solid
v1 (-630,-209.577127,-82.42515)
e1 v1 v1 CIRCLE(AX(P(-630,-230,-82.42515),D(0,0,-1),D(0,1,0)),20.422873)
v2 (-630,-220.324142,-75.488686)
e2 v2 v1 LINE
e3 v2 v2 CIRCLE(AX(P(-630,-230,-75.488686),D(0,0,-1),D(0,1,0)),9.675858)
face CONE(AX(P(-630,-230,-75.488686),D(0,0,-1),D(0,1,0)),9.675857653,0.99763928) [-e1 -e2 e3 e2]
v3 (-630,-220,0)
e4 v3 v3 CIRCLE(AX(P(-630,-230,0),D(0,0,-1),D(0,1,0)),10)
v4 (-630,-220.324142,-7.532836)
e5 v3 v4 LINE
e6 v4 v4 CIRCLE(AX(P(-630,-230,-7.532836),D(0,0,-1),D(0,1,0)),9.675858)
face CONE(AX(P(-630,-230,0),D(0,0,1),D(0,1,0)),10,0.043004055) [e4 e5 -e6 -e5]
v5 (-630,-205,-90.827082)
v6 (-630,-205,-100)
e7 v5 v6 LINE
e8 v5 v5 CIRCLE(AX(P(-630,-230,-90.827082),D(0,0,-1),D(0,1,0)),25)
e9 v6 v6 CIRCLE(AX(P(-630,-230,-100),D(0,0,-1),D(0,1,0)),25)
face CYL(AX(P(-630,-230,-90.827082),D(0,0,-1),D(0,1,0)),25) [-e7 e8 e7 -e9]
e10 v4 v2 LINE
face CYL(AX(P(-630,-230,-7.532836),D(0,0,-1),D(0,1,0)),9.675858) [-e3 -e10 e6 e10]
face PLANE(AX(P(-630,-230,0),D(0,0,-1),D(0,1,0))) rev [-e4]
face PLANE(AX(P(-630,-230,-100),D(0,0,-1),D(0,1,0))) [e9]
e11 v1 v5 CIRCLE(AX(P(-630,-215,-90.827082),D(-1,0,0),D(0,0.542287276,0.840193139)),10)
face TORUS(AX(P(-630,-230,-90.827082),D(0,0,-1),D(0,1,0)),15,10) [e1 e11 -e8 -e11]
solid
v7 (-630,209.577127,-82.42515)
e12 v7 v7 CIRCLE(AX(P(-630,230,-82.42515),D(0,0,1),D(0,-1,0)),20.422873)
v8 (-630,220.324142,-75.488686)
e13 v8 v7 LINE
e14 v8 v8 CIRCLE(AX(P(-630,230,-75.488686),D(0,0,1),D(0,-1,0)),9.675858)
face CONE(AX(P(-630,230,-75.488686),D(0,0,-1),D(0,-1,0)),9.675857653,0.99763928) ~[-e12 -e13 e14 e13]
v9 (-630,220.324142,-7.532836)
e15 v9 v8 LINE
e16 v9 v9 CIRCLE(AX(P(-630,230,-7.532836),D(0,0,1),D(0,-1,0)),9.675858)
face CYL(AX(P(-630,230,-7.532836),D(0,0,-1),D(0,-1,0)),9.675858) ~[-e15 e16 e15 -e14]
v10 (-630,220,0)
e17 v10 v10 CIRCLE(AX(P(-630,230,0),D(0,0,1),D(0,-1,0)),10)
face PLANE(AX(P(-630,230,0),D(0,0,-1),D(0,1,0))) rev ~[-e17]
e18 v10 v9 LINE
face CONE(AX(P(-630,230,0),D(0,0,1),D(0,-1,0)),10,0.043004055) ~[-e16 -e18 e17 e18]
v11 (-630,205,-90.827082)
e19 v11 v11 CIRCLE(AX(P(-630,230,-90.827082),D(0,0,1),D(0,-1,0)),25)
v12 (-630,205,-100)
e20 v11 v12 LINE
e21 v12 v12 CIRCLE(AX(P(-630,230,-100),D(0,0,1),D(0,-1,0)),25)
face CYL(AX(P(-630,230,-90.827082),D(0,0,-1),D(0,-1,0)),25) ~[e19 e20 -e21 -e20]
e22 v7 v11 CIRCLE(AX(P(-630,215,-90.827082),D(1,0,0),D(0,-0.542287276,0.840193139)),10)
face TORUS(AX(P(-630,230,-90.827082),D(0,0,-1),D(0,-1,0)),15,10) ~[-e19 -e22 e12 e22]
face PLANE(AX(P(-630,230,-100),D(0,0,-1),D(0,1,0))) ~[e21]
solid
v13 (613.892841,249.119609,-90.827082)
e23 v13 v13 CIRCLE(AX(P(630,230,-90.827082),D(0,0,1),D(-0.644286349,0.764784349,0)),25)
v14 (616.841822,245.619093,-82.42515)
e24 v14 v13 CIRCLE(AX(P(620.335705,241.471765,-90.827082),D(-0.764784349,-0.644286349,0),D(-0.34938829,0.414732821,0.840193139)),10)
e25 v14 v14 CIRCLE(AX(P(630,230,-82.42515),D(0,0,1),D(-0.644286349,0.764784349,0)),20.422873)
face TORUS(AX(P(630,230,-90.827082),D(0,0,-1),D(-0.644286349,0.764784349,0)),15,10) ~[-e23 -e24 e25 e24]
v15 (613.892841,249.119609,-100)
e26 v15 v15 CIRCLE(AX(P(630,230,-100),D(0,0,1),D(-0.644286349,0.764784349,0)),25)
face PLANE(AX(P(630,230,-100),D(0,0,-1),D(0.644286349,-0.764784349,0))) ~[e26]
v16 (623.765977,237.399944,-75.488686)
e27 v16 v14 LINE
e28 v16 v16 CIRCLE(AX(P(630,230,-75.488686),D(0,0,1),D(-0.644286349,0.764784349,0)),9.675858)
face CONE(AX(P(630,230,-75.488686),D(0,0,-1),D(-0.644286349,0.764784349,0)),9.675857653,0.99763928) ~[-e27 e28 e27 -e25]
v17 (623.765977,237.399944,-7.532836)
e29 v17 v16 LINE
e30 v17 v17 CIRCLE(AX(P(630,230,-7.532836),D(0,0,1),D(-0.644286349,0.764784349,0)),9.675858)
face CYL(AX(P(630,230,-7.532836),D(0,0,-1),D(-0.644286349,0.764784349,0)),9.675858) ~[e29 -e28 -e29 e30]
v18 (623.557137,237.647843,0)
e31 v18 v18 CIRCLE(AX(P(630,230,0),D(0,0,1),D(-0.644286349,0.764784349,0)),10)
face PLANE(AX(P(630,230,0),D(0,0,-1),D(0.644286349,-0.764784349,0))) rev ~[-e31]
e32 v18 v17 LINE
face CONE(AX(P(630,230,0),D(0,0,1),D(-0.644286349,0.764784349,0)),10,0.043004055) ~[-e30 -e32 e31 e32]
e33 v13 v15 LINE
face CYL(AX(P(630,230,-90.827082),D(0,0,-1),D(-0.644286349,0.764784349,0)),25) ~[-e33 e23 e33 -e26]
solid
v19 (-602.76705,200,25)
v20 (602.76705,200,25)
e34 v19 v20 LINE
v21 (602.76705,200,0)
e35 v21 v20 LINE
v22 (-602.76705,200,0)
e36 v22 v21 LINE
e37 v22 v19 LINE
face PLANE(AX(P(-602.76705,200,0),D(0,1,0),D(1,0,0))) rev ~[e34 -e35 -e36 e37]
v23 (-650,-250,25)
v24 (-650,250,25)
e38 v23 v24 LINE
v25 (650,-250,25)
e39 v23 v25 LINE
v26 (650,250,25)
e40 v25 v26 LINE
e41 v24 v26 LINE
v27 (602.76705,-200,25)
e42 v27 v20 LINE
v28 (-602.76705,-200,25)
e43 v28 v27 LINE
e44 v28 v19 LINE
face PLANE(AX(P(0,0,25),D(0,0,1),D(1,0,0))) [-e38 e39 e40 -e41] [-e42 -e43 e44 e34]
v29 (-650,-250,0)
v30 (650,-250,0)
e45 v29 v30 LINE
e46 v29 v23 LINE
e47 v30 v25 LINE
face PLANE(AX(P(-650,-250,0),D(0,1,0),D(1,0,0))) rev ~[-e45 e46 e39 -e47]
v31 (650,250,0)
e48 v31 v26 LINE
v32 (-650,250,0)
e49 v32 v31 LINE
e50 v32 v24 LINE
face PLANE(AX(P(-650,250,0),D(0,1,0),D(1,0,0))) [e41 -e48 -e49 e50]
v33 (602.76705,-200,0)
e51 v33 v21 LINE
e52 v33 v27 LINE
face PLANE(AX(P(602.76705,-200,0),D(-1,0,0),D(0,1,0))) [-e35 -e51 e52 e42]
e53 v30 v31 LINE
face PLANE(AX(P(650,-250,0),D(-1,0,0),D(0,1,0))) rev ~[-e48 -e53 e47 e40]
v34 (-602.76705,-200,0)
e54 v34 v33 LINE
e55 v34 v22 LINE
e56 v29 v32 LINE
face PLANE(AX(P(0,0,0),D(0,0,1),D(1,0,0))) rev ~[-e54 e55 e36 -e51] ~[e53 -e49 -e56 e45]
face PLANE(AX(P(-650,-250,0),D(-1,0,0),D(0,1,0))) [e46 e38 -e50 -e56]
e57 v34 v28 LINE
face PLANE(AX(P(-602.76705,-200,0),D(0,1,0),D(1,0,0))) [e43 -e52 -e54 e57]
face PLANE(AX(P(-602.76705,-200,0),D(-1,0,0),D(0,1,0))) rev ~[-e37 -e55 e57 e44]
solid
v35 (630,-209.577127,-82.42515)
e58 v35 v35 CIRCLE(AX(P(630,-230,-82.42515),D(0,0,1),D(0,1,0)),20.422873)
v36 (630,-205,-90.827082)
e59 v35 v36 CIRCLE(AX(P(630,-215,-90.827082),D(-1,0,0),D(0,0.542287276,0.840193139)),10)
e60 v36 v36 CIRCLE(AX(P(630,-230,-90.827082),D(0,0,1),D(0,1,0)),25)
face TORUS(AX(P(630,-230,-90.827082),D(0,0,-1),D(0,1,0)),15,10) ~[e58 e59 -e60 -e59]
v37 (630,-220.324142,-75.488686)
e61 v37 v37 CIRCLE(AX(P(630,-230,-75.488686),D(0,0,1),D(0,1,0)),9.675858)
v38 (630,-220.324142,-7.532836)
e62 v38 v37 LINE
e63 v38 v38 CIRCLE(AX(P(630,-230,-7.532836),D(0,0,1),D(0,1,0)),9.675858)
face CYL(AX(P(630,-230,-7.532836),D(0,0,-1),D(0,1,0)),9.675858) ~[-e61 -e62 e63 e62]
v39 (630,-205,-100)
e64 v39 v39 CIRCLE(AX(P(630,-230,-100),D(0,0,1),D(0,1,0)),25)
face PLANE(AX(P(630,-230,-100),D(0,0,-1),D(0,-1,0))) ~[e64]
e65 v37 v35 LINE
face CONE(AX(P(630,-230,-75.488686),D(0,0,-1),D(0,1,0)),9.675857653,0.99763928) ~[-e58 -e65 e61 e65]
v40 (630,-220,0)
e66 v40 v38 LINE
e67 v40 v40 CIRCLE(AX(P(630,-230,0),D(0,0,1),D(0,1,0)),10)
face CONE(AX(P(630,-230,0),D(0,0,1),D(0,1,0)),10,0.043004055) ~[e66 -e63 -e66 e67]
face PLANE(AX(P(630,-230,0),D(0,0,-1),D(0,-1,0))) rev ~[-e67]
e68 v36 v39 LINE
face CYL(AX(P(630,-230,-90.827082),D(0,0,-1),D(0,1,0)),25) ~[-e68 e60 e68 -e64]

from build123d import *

# Parameters (mm, degrees)
F7_W     = 1300
F7_H     = 500
F7_W_2   = 1205.5341005325
F7_H_2   = 400
F8_DEPTH = 25


# Not quite as in the source:
# - a pattern or mirror of a feature is missing from the dataset's text; its kind, count and spacing are read off the source's solid


with BuildPart() as f6:
    # F5 (on line) → F6 (revolve)
    with BuildSketch(Plane(origin=(-630, 0, 0), x_dir=(0, -1, 0), z_dir=(-1, 0, 0))):
        with BuildLine():
            Line((230, 0), (220, 0))
            Line((220, 0), (220.3241423469, -7.5328363425))
            Line((220.3241423469, -7.5328363425), (220.3241423469, -75.4886860348))
            Line((220.3241423469, -75.4886860348), (209.5771272384, -82.4251501433))
            ThreePointArc((209.5771272384, -82.4251501433), (206.2185215477, -86.0431881155), (205, -90.8270815291))
            Line((205, -90.8270815291), (205, -100))
            Line((205, -100), (230, -100))
            Line((230, -100), (230, 0))
        make_face()
    revolve(axis=Axis((-630, -230, -56.9955855608), (0, 0, -1)))


with BuildPart() as f6_copies_1:
    # F6_copies: instance of F6
    add(f6.part.mirror(Plane(origin=(0, 0, 0), x_dir=(-0.3429399739, 0.9393573198, 0), z_dir=(0.9393573198, 0.3429399739, 0))))


with BuildPart() as f6_copies1_1:
    # F6_copies1: instance of F6
    add(f6.part.mirror(Plane(origin=(0, 0, 0), x_dir=(0, 0, 1), z_dir=(1, 0, 0))))


with BuildPart() as f6_copies2_1:
    # F6_copies2: instance of F6
    add(f6.part.mirror(Plane.ZX))


with BuildPart() as f8:
    # F7 (on face) → F8 (new body)
    with BuildSketch(Plane.XY):
        Rectangle(F7_W, F7_H)
        Rectangle(F7_W_2, F7_H_2, mode=Mode.SUBTRACT)
    extrude(amount=F8_DEPTH)


solid = Compound([f6.part, f6_copies_1.part, f6_copies1_1.part, f6_copies2_1.part, f8.part])
